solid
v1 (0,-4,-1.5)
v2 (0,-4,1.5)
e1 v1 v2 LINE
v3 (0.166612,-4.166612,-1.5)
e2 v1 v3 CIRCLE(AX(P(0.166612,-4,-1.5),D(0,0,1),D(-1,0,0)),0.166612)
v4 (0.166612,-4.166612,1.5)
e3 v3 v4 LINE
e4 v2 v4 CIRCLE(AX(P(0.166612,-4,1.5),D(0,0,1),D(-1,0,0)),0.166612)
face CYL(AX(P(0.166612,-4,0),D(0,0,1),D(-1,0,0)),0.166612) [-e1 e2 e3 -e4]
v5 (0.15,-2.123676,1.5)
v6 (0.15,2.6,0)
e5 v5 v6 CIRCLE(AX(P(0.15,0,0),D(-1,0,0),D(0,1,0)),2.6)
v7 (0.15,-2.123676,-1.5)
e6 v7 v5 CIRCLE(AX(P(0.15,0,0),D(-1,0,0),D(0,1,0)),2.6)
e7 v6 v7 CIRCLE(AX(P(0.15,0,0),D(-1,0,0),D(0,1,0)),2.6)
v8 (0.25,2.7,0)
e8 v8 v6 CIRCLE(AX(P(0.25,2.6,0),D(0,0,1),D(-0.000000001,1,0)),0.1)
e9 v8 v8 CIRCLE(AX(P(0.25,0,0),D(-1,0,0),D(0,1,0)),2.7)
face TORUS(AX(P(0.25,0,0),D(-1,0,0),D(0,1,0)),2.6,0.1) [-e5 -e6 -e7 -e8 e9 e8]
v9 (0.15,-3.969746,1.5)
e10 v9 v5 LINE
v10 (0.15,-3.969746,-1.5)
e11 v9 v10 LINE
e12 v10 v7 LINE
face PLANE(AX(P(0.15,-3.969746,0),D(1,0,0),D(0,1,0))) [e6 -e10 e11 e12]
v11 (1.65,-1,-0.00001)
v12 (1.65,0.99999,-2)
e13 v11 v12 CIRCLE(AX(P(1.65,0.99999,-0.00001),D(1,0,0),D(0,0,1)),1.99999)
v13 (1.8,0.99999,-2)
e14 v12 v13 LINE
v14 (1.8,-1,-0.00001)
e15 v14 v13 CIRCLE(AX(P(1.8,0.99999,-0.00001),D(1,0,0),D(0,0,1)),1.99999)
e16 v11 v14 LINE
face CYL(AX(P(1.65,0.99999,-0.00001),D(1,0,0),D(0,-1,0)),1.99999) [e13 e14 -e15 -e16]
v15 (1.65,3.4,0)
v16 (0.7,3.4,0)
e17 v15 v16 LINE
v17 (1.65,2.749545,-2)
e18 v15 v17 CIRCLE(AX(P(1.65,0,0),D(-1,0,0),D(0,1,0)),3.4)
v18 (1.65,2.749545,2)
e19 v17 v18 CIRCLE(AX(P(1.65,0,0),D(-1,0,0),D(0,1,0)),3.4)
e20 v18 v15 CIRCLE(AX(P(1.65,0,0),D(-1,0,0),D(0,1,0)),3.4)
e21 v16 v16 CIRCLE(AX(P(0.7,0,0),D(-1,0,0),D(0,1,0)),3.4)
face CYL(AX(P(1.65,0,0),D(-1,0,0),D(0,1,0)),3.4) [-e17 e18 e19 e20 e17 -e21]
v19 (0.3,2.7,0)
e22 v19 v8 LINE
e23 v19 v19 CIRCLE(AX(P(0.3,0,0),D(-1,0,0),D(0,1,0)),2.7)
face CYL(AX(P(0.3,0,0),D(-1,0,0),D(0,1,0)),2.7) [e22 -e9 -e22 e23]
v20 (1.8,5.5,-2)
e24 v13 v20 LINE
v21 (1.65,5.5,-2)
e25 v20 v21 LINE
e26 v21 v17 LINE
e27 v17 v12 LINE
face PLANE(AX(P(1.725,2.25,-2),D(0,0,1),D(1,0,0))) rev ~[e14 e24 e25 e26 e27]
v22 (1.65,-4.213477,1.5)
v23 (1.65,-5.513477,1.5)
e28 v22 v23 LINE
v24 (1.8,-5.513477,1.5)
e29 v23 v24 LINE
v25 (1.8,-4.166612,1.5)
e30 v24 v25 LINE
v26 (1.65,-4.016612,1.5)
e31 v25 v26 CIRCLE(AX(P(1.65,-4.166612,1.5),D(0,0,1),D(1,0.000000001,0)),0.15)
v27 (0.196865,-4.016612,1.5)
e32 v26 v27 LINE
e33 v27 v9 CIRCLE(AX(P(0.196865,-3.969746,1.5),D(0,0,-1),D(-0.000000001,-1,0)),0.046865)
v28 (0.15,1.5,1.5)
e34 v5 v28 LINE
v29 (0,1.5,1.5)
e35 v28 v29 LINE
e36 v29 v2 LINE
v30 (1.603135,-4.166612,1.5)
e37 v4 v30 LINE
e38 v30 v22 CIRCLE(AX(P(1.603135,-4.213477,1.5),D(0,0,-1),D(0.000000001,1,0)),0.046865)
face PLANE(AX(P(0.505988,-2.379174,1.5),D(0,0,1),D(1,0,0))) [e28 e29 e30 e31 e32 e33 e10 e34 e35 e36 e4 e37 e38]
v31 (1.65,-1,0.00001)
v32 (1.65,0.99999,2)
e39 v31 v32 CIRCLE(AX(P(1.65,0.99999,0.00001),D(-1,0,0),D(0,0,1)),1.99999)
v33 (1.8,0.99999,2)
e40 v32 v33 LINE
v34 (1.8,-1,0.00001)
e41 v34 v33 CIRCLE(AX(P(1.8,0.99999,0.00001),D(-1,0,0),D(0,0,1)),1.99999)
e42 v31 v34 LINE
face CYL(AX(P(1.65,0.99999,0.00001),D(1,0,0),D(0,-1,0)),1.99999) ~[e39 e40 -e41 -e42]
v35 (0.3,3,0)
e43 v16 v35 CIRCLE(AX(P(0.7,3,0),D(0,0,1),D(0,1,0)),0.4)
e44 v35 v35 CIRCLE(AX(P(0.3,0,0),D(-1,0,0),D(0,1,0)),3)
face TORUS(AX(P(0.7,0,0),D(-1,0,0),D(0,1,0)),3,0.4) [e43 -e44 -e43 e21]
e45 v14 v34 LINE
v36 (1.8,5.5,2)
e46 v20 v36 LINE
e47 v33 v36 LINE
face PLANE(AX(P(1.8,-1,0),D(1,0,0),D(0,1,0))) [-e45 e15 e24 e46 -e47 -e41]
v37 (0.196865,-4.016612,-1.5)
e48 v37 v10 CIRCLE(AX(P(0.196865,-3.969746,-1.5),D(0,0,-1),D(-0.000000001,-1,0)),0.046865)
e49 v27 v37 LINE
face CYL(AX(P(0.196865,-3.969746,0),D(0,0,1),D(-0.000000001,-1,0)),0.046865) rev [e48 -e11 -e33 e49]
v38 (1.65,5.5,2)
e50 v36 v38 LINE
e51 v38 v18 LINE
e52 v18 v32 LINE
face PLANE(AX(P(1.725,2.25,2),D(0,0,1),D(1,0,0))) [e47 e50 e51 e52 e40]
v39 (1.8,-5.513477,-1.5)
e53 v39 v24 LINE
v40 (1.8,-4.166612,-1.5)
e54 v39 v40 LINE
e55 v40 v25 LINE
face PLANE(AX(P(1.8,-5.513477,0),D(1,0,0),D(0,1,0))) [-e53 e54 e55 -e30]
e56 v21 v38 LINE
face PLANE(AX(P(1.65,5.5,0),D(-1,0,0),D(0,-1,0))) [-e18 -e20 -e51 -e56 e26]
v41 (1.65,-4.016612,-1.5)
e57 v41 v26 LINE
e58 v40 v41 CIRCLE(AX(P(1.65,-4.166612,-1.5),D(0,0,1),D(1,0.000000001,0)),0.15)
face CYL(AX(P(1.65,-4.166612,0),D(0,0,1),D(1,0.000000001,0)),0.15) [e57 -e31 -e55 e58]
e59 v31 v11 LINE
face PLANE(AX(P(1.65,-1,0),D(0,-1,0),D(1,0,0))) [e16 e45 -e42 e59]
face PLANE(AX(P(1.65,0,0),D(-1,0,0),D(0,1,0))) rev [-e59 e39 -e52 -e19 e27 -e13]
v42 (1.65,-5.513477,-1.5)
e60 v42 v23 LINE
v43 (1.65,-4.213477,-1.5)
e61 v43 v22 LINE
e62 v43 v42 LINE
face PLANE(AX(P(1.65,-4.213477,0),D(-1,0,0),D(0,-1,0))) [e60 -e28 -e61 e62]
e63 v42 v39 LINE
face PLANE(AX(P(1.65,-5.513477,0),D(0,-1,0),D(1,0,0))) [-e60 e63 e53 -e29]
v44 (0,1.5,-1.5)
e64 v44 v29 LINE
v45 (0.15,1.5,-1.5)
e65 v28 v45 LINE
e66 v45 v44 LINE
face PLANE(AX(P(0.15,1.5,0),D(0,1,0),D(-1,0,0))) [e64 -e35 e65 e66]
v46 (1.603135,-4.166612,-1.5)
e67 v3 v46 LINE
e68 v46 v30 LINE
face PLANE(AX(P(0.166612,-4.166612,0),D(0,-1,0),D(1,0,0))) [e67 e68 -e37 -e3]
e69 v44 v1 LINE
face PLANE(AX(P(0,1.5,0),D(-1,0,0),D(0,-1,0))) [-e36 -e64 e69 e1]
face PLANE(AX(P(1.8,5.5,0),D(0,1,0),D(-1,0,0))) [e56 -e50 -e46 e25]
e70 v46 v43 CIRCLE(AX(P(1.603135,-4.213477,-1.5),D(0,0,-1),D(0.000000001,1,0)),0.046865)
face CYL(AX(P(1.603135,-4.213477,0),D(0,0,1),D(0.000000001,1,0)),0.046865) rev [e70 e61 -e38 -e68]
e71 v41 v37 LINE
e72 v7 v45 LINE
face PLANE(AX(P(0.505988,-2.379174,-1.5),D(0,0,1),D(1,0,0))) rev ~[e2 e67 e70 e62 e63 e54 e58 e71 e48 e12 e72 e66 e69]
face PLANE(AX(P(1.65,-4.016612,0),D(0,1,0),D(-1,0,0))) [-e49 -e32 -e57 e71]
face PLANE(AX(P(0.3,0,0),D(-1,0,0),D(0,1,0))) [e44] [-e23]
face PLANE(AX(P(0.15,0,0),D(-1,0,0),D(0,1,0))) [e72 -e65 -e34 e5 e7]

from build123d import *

# Parameters (mm, degrees)
F1_DEPTH      = 1.5
F1_DEPTH_BACK = 1.5
F4_DEPTH      = 2
F4_DEPTH_BACK = 2
F5_R          = 1.99999


# Not quite as in the source:
# - a fillet or chamfer is up to 0.001 mm smaller than in the source, because OpenCascade refuses the exact size


with BuildPart() as f1:
    # F0 (on Top) → F1 (new body, two sides)
    with BuildSketch(Plane.XY) as f1_sk:
        with BuildLine():
            Line((0.15, 1.5), (0, 1.5))
            Line((0, 1.5), (0, 0))
            Line((0, 0), (0, -4))
            ThreePointArc((0, -4), (0.0487994019, -4.1178121778), (0.1666115796, -4.1666115796))
            Line((0.1666115796, -4.1666115796), (1.6031347549, -4.1666115796))
            ThreePointArc((1.6031347549, -4.1666115796), (1.6362734875, -4.1803380921), (1.65, -4.2134768248))
            Line((1.65, -4.2134768248), (1.65, -5.5134768248))
            Line((1.65, -5.5134768248), (1.8, -5.5134768248))
            Line((1.8, -5.5134768248), (1.8, -4.1666115796))
            ThreePointArc((1.8, -4.1666115796), (1.7560660172, -4.0605455625), (1.65, -4.0166115796))
            Line((1.65, -4.0166115796), (0.1968652451, -4.0166115796))
            ThreePointArc((0.1968652451, -4.0166115796), (0.1637265125, -4.0028850671), (0.15, -3.9697463345))
            Line((0.15, -3.9697463345), (0.15, 0))
            Line((0.15, 0), (0.15, 1.5))
        make_face()
    extrude(amount=F1_DEPTH)
    extrude(f1_sk.sketch, amount=-F1_DEPTH_BACK)

    # F0 (on Top) → F2 (revolve)
    with BuildSketch(Plane.XY):
        with BuildLine():
            Line((0.15, 2.6), (0.15, 1.5))
            Line((0.15, 1.5), (0.15, 0))
            Line((0.15, 0), (0.3, 0))
            Line((0.3, 0), (0.3, 2.7))
            Line((0.3, 2.7), (0.25, 2.7))
            ThreePointArc((0.25, 2.7), (0.1792893219, 2.6707106781), (0.15, 2.6))
        make_face()
    revolve(axis=Axis((0.225, 0, 0), (-1, 0, 0)))

    # F0 (on Top) → F3 (revolve)
    with BuildSketch(Plane.XY):
        with BuildLine():
            Line((0.3, 2.7), (0.3, 0))
            Line((0.3, 0), (1.65, 0))
            Line((1.65, 0), (1.65, 3.4))
            Line((1.65, 3.4), (0.7, 3.4))
            ThreePointArc((0.7, 3.4), (0.4171572875, 3.2828427125), (0.3, 3))
            Line((0.3, 3), (0.3, 2.7))
        make_face()
    revolve(axis=Axis((0.975, 0, 0), (-1, 0, 0)))

    # F0 (on Top) → F4 (join, two sides)
    with BuildSketch(Plane.XY) as f4_sk:
        Polygon((1.65, 3.4), (1.65, 0), (1.65, -1), (1.8, -1), (1.8, 5.5), (1.65, 5.5), align=None)
    extrude(amount=F4_DEPTH)
    extrude(f4_sk.sketch, amount=-F4_DEPTH_BACK)

    # F5 (radius 2 in the source; OpenCascade refuses exactly that, so slightly less here)
    f5_edges = [f1.edges().sort_by_distance(p)[0] for p in [
        (1.725, -1, -2),
        (1.725, -1, 2),
    ]]
    fillet(f5_edges, radius=F5_R)


solid = f1.part
